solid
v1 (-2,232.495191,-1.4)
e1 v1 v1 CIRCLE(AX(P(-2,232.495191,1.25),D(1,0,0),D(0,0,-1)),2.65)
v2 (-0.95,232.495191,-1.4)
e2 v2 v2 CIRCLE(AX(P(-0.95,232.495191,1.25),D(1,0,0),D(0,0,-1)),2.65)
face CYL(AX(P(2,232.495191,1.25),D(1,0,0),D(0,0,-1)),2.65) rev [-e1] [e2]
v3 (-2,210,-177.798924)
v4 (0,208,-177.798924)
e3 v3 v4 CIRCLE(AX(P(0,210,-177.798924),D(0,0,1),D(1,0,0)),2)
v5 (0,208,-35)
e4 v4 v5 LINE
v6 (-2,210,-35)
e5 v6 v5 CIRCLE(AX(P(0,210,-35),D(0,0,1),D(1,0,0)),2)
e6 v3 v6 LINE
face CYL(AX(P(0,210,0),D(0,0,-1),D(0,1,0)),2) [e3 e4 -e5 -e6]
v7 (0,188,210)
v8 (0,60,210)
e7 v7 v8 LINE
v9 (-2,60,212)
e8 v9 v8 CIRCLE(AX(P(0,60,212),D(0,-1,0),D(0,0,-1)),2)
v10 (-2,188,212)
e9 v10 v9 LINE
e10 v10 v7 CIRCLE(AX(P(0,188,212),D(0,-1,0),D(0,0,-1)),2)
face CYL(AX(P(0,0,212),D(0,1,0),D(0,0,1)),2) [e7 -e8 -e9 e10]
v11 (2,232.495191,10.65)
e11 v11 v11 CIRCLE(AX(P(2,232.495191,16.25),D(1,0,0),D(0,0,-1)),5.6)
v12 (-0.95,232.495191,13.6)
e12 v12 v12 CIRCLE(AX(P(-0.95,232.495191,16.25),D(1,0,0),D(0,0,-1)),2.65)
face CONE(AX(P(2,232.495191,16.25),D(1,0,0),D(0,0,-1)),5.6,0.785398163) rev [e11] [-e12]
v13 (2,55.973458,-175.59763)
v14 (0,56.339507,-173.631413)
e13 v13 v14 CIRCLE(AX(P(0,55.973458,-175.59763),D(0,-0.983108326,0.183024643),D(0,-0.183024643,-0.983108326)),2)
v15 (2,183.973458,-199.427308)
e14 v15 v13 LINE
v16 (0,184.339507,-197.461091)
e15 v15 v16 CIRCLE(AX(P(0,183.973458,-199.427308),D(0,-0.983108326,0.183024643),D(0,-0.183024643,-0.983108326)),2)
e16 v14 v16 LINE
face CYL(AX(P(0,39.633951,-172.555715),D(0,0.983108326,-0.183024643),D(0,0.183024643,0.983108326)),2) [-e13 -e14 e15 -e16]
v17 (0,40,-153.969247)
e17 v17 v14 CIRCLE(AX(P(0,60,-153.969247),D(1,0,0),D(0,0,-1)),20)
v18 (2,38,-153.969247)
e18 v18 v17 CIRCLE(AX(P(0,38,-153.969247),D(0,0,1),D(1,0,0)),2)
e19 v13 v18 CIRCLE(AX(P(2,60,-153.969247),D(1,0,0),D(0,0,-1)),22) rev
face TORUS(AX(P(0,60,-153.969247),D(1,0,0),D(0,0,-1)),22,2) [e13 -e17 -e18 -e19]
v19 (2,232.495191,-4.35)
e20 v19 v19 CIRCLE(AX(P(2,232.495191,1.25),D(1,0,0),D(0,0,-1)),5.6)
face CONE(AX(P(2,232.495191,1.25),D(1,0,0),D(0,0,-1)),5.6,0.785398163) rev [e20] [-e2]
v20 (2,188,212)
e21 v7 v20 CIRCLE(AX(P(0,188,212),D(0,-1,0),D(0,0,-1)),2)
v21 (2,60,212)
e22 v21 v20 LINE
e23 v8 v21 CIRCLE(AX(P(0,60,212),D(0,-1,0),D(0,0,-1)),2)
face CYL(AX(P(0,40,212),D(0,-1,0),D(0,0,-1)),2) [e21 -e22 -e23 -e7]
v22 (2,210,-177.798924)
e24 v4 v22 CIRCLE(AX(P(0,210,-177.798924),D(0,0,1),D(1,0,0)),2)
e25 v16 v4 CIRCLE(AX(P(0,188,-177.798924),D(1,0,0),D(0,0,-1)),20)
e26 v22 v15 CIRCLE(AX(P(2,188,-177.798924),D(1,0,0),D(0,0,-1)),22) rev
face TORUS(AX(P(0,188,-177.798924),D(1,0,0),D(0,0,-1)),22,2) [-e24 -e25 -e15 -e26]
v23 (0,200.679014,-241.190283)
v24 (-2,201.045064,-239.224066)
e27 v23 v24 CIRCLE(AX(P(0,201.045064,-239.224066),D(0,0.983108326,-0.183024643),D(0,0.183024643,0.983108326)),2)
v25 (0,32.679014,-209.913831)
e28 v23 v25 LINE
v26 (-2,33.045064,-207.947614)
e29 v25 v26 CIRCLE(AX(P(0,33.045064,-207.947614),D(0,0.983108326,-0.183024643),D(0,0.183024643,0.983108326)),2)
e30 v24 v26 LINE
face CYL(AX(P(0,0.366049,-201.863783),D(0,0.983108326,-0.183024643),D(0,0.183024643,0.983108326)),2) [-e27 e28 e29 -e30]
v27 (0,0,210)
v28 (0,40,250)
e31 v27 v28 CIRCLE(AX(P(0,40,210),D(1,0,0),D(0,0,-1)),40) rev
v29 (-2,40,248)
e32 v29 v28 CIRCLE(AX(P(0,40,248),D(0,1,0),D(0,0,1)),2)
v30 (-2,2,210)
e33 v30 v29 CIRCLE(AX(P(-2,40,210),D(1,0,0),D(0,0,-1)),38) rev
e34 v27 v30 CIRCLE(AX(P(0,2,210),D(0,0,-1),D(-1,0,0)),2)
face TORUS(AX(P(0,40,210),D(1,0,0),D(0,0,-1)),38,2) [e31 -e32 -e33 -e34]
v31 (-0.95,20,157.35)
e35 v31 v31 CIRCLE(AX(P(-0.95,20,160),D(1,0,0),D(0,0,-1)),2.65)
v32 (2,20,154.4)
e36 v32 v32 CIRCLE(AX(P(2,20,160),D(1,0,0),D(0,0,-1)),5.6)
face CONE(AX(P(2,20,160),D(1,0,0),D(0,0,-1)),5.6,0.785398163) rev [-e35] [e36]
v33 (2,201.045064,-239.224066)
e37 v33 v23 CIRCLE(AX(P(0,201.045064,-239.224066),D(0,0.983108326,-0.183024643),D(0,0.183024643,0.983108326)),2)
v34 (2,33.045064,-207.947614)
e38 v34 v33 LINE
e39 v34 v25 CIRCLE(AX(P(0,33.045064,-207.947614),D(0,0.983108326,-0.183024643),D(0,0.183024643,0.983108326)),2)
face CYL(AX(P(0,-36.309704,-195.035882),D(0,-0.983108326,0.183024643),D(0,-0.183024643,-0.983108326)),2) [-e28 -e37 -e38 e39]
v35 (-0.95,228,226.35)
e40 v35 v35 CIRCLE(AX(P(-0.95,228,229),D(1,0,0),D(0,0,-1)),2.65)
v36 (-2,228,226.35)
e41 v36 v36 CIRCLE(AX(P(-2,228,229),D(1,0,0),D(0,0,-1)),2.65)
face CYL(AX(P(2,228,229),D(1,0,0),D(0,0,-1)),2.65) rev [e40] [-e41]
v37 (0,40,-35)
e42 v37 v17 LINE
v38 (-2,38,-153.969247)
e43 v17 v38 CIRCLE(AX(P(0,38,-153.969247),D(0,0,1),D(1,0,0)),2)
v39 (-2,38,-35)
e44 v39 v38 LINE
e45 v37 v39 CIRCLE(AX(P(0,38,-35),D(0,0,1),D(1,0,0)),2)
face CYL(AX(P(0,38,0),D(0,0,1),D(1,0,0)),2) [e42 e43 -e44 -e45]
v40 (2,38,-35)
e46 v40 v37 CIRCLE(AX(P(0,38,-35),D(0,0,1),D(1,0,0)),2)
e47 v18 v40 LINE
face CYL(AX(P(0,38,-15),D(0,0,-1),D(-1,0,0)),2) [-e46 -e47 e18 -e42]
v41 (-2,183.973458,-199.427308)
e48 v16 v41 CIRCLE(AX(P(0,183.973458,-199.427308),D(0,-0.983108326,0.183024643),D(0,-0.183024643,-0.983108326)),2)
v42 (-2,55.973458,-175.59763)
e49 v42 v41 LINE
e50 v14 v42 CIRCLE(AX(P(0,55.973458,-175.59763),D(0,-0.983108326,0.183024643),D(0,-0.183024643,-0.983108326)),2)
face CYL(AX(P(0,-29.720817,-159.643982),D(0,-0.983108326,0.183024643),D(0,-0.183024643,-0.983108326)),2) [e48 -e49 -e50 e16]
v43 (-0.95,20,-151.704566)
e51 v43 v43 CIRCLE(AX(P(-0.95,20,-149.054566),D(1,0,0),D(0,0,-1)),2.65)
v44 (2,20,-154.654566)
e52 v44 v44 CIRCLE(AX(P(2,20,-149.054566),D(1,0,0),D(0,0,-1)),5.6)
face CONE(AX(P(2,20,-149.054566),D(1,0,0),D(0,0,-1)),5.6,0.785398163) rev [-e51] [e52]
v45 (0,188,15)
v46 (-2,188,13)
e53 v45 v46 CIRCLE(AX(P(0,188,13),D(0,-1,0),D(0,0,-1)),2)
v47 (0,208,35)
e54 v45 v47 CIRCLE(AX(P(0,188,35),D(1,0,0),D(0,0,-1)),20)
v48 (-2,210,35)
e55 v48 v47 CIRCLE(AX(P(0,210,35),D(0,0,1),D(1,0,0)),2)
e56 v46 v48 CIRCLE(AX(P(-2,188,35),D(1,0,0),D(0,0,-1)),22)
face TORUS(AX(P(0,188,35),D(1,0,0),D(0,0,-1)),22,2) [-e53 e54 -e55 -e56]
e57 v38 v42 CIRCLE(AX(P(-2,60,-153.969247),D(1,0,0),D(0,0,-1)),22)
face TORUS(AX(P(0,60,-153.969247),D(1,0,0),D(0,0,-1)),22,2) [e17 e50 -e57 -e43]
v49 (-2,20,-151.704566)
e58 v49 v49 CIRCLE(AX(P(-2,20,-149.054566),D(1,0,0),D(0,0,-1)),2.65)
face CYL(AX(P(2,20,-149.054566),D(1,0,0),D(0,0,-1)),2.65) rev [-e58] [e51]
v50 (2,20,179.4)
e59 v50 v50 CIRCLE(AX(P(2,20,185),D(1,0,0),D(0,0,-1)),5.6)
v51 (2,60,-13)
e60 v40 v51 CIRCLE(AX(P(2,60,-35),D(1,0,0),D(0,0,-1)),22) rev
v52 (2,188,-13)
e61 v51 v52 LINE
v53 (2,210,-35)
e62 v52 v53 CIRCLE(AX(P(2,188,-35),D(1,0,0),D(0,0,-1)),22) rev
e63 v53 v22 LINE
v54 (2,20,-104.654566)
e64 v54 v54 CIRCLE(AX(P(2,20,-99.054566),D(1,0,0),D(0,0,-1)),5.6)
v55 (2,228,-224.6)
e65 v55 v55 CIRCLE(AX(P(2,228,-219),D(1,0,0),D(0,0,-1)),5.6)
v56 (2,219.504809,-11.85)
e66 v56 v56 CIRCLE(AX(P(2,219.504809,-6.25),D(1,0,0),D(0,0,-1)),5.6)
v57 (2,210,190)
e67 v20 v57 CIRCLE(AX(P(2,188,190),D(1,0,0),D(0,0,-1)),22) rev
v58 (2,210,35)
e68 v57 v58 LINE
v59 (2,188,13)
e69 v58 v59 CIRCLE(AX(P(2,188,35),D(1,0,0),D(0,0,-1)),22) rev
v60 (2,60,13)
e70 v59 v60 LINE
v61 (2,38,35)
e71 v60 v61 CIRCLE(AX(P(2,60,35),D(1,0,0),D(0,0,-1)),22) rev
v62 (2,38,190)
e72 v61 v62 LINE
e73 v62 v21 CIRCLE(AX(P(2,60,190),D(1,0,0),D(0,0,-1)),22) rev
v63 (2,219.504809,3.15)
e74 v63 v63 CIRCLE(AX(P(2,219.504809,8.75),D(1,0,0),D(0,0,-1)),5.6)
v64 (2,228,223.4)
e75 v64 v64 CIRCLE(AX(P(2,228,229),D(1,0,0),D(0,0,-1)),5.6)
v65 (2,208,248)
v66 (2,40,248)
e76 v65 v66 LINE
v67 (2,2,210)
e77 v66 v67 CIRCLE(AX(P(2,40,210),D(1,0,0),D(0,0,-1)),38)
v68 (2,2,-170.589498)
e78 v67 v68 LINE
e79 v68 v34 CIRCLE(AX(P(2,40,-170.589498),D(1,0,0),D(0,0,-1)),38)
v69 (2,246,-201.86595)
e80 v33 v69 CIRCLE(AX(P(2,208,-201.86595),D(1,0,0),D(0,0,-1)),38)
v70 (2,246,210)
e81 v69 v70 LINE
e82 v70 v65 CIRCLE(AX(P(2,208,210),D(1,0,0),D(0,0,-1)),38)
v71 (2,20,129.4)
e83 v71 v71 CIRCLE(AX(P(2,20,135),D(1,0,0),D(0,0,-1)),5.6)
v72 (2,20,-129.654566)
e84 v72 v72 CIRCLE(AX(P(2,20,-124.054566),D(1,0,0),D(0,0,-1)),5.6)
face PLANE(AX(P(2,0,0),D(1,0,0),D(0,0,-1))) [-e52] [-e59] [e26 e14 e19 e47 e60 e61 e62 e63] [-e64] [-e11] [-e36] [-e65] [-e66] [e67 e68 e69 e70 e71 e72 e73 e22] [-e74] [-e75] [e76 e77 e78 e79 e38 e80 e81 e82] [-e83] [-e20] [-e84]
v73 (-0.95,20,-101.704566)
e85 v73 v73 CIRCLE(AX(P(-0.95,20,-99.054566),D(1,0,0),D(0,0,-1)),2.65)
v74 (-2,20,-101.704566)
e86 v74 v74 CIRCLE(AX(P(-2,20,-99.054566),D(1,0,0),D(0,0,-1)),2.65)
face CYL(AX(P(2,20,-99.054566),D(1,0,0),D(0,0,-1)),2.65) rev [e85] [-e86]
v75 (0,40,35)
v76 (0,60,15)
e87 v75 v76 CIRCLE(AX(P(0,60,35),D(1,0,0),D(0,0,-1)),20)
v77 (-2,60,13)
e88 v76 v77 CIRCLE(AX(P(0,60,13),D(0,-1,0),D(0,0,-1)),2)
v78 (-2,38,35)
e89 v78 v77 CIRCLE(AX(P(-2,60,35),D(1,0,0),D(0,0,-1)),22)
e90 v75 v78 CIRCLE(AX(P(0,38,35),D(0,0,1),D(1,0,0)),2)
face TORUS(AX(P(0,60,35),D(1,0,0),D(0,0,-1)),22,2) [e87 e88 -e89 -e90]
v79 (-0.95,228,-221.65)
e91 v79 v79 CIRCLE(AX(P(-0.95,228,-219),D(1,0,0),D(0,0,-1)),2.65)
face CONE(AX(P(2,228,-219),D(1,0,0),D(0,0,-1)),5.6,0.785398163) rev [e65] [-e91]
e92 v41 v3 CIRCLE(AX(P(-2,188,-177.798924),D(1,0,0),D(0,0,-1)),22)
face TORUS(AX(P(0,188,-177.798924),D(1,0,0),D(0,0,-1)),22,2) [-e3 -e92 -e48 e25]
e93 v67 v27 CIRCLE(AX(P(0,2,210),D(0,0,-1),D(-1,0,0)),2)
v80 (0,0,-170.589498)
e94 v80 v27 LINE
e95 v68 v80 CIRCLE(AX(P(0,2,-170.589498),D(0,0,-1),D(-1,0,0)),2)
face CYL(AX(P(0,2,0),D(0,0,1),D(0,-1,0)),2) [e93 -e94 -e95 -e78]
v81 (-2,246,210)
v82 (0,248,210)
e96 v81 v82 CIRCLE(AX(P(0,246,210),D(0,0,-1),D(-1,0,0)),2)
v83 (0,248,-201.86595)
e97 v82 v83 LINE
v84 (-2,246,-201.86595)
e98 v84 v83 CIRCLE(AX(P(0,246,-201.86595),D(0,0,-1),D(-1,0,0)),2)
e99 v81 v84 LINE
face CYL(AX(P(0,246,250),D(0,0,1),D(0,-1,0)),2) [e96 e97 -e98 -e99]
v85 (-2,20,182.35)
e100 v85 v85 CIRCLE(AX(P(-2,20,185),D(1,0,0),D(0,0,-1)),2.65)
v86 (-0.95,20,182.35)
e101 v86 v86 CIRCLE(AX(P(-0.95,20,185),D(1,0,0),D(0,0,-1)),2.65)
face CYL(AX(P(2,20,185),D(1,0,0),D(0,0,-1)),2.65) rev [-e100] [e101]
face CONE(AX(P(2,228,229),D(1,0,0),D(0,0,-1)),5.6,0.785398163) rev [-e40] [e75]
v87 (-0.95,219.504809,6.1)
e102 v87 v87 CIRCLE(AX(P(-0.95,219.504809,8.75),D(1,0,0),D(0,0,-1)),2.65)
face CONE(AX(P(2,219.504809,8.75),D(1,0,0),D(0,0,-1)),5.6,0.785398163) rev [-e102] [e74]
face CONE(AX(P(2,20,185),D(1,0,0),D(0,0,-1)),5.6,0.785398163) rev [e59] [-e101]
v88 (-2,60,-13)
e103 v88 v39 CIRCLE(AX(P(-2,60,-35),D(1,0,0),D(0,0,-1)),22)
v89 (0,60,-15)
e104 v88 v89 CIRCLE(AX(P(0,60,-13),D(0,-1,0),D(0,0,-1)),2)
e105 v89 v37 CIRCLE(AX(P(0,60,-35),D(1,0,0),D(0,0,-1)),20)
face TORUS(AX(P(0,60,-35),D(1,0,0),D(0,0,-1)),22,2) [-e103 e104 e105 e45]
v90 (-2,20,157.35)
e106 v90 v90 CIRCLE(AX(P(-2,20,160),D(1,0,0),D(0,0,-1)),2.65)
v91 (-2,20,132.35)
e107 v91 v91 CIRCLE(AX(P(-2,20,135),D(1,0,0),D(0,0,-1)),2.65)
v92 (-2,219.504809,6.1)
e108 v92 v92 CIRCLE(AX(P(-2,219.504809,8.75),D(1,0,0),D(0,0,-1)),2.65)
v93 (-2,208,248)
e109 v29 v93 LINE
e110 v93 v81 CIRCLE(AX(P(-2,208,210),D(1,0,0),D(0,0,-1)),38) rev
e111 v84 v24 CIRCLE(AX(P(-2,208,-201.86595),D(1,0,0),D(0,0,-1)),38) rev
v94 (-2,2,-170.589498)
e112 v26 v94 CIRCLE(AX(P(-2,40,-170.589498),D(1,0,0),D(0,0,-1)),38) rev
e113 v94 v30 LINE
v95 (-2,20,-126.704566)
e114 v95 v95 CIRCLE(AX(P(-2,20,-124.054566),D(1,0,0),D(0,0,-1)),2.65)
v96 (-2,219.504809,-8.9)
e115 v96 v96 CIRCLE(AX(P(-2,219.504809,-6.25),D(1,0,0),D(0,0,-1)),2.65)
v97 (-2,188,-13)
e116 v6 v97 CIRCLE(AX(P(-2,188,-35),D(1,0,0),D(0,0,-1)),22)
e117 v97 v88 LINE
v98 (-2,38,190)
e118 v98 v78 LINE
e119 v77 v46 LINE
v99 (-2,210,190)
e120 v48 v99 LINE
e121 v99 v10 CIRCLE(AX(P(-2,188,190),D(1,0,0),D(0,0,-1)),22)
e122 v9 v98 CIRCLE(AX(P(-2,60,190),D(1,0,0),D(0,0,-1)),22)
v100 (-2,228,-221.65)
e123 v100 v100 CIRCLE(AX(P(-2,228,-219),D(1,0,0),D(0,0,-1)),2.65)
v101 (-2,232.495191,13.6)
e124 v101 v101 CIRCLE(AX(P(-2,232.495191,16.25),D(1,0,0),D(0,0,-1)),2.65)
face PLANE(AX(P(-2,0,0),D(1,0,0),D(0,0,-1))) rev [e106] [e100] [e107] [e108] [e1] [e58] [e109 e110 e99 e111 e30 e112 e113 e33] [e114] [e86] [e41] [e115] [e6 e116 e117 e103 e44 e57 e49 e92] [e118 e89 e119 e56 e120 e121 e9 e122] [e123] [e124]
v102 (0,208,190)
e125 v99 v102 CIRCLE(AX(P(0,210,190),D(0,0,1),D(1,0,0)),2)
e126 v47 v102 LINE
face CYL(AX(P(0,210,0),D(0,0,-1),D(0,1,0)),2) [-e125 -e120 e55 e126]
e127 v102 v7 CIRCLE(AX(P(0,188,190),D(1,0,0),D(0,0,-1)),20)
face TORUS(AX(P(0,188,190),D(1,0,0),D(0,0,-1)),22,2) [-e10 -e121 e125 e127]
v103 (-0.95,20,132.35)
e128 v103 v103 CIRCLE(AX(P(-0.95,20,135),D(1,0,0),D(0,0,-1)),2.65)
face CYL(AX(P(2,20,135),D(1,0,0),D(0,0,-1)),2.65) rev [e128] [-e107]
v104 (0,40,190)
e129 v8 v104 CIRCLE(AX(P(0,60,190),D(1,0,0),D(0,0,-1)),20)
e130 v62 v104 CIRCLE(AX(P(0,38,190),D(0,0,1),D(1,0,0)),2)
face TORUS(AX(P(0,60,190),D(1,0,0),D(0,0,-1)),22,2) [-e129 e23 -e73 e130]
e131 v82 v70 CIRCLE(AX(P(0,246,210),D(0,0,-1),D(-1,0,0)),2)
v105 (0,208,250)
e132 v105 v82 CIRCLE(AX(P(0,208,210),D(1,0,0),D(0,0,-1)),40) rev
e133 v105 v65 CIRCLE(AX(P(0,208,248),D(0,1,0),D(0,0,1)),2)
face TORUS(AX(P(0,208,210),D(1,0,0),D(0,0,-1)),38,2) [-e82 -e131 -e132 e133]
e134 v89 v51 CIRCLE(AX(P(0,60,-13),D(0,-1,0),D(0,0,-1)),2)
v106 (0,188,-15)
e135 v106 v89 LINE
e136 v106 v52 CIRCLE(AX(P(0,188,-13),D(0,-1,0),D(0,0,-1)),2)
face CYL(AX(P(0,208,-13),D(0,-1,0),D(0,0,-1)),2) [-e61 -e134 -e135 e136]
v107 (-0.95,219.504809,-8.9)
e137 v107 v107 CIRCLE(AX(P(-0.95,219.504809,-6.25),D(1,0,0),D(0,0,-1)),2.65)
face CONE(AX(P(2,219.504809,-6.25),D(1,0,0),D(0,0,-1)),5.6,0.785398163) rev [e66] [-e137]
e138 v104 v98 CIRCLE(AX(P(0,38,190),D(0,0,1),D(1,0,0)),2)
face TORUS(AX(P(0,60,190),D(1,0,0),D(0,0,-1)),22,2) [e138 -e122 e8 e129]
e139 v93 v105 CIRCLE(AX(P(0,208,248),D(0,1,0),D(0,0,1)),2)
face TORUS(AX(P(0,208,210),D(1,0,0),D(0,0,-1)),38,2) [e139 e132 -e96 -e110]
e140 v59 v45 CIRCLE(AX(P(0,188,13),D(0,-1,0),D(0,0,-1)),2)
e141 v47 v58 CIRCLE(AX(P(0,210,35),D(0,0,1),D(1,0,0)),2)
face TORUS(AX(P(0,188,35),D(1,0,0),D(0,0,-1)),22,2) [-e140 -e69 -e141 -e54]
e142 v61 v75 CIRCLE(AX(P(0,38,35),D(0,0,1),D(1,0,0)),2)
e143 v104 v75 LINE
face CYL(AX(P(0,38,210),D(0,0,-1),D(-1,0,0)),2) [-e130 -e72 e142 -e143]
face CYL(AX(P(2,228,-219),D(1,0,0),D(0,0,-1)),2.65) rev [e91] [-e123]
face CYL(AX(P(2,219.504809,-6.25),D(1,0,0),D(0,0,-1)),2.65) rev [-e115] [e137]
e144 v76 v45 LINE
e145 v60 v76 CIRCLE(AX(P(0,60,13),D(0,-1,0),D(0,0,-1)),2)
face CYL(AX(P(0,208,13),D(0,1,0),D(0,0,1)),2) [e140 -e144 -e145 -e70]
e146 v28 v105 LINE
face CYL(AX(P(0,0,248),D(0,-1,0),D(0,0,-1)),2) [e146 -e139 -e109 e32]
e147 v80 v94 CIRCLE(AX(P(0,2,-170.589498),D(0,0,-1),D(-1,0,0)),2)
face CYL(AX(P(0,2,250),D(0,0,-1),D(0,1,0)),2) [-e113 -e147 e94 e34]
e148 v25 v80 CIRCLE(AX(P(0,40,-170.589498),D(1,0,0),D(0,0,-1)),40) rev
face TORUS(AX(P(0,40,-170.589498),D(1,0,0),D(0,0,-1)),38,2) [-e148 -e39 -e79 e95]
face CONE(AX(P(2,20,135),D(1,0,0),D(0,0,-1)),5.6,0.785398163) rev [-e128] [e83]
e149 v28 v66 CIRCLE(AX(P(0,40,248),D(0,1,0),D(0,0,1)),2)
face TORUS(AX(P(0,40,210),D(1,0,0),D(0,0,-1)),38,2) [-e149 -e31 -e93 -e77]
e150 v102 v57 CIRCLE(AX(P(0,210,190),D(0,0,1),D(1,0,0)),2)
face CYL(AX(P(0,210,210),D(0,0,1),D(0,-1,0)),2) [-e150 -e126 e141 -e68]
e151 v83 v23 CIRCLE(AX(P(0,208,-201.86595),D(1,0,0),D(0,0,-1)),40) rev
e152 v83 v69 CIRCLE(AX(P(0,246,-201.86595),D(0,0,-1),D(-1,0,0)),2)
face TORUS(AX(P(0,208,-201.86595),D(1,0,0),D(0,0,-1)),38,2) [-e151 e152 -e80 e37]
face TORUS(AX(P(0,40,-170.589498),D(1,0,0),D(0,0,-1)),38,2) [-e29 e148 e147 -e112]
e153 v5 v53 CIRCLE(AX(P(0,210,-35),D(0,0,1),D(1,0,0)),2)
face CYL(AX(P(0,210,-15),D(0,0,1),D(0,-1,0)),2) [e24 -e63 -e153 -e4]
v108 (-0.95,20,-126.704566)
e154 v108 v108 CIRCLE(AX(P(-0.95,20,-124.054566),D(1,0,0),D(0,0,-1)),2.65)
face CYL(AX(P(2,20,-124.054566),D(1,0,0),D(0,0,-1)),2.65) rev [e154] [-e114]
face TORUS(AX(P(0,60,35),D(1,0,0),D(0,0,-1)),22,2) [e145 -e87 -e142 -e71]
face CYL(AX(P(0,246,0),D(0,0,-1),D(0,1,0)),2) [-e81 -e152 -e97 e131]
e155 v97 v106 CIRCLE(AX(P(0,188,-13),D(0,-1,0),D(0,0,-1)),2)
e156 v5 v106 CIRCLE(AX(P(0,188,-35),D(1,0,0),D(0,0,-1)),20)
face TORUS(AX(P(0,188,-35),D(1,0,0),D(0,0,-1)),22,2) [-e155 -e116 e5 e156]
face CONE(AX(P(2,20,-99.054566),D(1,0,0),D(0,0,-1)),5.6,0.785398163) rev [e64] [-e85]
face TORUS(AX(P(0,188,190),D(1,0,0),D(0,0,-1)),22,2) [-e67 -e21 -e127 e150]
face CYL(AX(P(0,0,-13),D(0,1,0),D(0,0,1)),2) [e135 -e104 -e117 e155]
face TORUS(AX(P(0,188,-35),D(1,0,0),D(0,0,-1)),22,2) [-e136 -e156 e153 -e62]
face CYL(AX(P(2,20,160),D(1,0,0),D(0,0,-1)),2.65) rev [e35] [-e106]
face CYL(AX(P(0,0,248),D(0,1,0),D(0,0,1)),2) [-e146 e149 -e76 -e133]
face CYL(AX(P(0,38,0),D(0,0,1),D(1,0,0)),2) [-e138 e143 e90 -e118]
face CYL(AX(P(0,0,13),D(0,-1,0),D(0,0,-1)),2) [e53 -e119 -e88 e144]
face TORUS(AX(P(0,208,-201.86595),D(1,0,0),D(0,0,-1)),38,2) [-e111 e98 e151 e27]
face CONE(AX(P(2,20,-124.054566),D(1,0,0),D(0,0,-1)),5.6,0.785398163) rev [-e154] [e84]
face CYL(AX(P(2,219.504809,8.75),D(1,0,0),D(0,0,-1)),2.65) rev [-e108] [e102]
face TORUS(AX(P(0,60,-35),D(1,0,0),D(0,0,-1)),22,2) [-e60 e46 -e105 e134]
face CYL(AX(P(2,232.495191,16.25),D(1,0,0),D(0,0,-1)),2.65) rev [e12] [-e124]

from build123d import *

# Parameters (mm, degrees)
CROQUIS1_W                                    = 195
CROQUIS1_H                                    = 168
SALIENTE_EXTRUIR1_DEPTH                       = 2
REDONDEO1_R                                   = 40
REDONDEO2_R                                   = 20
REFRENTADO_PARA_TORNILLO_TAP_N_CON_C_2_COUNT  = 2
REFRENTADO_PARA_TORNILLO_TAP_N_CON_C_2_PITCH  = 448
REFRENTADO_PARA_TORNILLO_TAP_N_CON_C_3_COUNT  = 2
REFRENTADO_PARA_TORNILLO_TAP_N_CON_C_3_PITCH  = 431.496529335
REFRENTADO_PARA_TORNILLO_TAP_N_CON_C_4_COUNT  = 2
REFRENTADO_PARA_TORNILLO_TAP_N_CON_C_4_PITCH  = 409.770089844
REFRENTADO_PARA_TORNILLO_TAP_N_CON_C_5_COUNT  = 2
REFRENTADO_PARA_TORNILLO_TAP_N_CON_C_5_PITCH  = 388.43763751
REFRENTADO_PARA_TORNILLO_TAP_N_CON_C_6_COUNT  = 2
REFRENTADO_PARA_TORNILLO_TAP_N_CON_C_6_PITCH  = 212.602916255
REFRENTADO_PARA_TORNILLO_TAP_N_CON_C_7_COUNT  = 2
REFRENTADO_PARA_TORNILLO_TAP_N_CON_C_7_PITCH  = 219.146070008
REFRENTADO_PARA_TORNILLO_TAP_N_CON_C_8_COUNT  = 2
REFRENTADO_PARA_TORNILLO_TAP_N_CON_C_8_PITCH  = 228.25424421
REFRENTADO_PARA_TORNILLO_TAP_N_CON_C_9_COUNT  = 2
REFRENTADO_PARA_TORNILLO_TAP_N_CON_C_9_PITCH  = 227.794357344
REFRENTADO_PARA_TORNILLO_TAP_N_CON_C_10_COUNT = 2
REFRENTADO_PARA_TORNILLO_TAP_N_CON_C_10_PITCH = 212.797484097
REFRENTADO_PARA_TORNILLO_TAP_N_CON_C_11_COUNT = 2
REFRENTADO_PARA_TORNILLO_TAP_N_CON_C_11_PITCH = 220.413771716
REFRENTADO_PARA_TORNILLO_TAP_N_CON_C_12_COUNT = 2
REFRENTADO_PARA_TORNILLO_TAP_N_CON_C_12_PITCH = 235.403336344
REDONDEO3_R                                   = 2


with BuildPart() as part:
    # Croquis1 → Saliente-Extruir1 (new, symmetric)
    with BuildSketch(Plane(origin=(0, 0, 0), x_dir=(0, 0, -1), z_dir=(1, 0, 0))):
        Polygon((-250, 0), (-250, 248), (250, 248), (203.83, 0), align=None)
        Polygon((170.589497977, 40), (201.86594959, 208), (15, 208), (15, 40), align=None, mode=Mode.SUBTRACT)
        with Locations((-112.5, 124)):
            Rectangle(CROQUIS1_W, CROQUIS1_H, mode=Mode.SUBTRACT)
    extrude(amount=SALIENTE_EXTRUIR1_DEPTH, both=True)

    # Redondeo1
    redondeo1_edges = [part.edges().sort_by_distance(p)[0] for p in [
        (0, 248, -250),
        (0, 0, -203.83),
        (0, 0, 250),
        (0, 248, 250),
    ]]
    fillet(redondeo1_edges, radius=REDONDEO1_R)

    # Redondeo2
    redondeo2_edges = [part.edges().sort_by_distance(p)[0] for p in [
        (0, 208, 15),
        (0, 208, 210),
        (0, 40, 210),
        (0, 40, 15),
        (0, 208, -201.86594959),
        (0, 208, -15),
        (0, 40, -15),
        (0, 40, -170.589497977),
    ]]
    fillet(redondeo2_edges, radius=REDONDEO2_R)

    # Croquis14 → Refrentado para tornillo tapón con cabeza plana de clavija de M51 (revolve, cut)
    with BuildSketch(Plane(origin=(2, 228, 229), x_dir=(0, 0, -1), z_dir=(0, 1, 0))):
        Polygon((0, 0), (0, 4), (2.65, 4), (2.65, 2.95), (5.6, 0), align=None)
    refrentado_para_tornillo_tap_n_con_cabez = revolve(axis=Axis((8.35, 228, 229), (-1, 0, 0)), mode=Mode.SUBTRACT)

    # Refrentado para tornillo tap_n con c 2: Refrentado para tornillo tapón con cabeza plana de clavija de M51 ×2
    with Locations(*[(0, 0, -i * REFRENTADO_PARA_TORNILLO_TAP_N_CON_C_2_PITCH) for i in range(1, REFRENTADO_PARA_TORNILLO_TAP_N_CON_C_2_COUNT)]):
        add(refrentado_para_tornillo_tap_n_con_cabez, mode=Mode.SUBTRACT)

    # Refrentado para tornillo tap_n con c 3: Refrentado para tornillo tapón con cabeza plana de clavija de M51 ×2
    with Locations(*[Vector(0, -0.4820432746483433, -0.8761474084686333) * (i * REFRENTADO_PARA_TORNILLO_TAP_N_CON_C_3_PITCH) for i in range(1, REFRENTADO_PARA_TORNILLO_TAP_N_CON_C_3_COUNT)]):
        add(refrentado_para_tornillo_tap_n_con_cabez, mode=Mode.SUBTRACT)

    # Refrentado para tornillo tap_n con c 4: Refrentado para tornillo tapón con cabeza plana de clavija de M51 ×2
    with Locations(*[Vector(0, -0.5076017141197064, -0.8615918406198702) * (i * REFRENTADO_PARA_TORNILLO_TAP_N_CON_C_4_PITCH) for i in range(1, REFRENTADO_PARA_TORNILLO_TAP_N_CON_C_4_COUNT)]):
        add(refrentado_para_tornillo_tap_n_con_cabez, mode=Mode.SUBTRACT)

    # Refrentado para tornillo tap_n con c 5: Refrentado para tornillo tapón con cabeza plana de clavija de M51 ×2
    with Locations(*[Vector(0, -0.5354784910482062, -0.8445488651491613) * (i * REFRENTADO_PARA_TORNILLO_TAP_N_CON_C_5_PITCH) for i in range(1, REFRENTADO_PARA_TORNILLO_TAP_N_CON_C_5_COUNT)]):
        add(refrentado_para_tornillo_tap_n_con_cabez, mode=Mode.SUBTRACT)

    # Refrentado para tornillo tap_n con c 6: Refrentado para tornillo tapón con cabeza plana de clavija de M51 ×2
    with Locations(*[Vector(0, -0.9783497031189412, -0.20695859104439157) * (i * REFRENTADO_PARA_TORNILLO_TAP_N_CON_C_6_PITCH) for i in range(1, REFRENTADO_PARA_TORNILLO_TAP_N_CON_C_6_COUNT)]):
        add(refrentado_para_tornillo_tap_n_con_cabez, mode=Mode.SUBTRACT)

    # Refrentado para tornillo tap_n con c 7: Refrentado para tornillo tapón con cabeza plana de clavija de M51 ×2
    with Locations(*[Vector(0, -0.9491386270002529, -0.3148584868414302) * (i * REFRENTADO_PARA_TORNILLO_TAP_N_CON_C_7_PITCH) for i in range(1, REFRENTADO_PARA_TORNILLO_TAP_N_CON_C_7_COUNT)]):
        add(refrentado_para_tornillo_tap_n_con_cabez, mode=Mode.SUBTRACT)

    # Refrentado para tornillo tap_n con c 8: Refrentado para tornillo tapón con cabeza plana de clavija de M51 ×2
    with Locations(*[Vector(0, -0.9112645450237129, -0.4118214770780242) * (i * REFRENTADO_PARA_TORNILLO_TAP_N_CON_C_8_PITCH) for i in range(1, REFRENTADO_PARA_TORNILLO_TAP_N_CON_C_8_COUNT)]):
        add(refrentado_para_tornillo_tap_n_con_cabez, mode=Mode.SUBTRACT)

    # Refrentado para tornillo tap_n con c 9: Refrentado para tornillo tapón con cabeza plana de clavija de M51 ×2
    with Locations(*[Vector(0, 0.019733546435435883, -0.9998052746135522) * (i * REFRENTADO_PARA_TORNILLO_TAP_N_CON_C_9_PITCH) for i in range(1, REFRENTADO_PARA_TORNILLO_TAP_N_CON_C_9_COUNT)]):
        add(refrentado_para_tornillo_tap_n_con_cabez, mode=Mode.SUBTRACT)

    # Refrentado para tornillo tap_n con c 10: Refrentado para tornillo tapón con cabeza plana de clavija de M51 ×2
    with Locations(*[Vector(0, 0.021124265390001246, -0.9997768578096479) * (i * REFRENTADO_PARA_TORNILLO_TAP_N_CON_C_10_PITCH) for i in range(1, REFRENTADO_PARA_TORNILLO_TAP_N_CON_C_10_COUNT)]):
        add(refrentado_para_tornillo_tap_n_con_cabez, mode=Mode.SUBTRACT)

    # Refrentado para tornillo tap_n con c 11: Refrentado para tornillo tapón con cabeza plana de clavija de M51 ×2
    with Locations(*[Vector(0, -0.03854201333356631, -0.9992569805651573) * (i * REFRENTADO_PARA_TORNILLO_TAP_N_CON_C_11_PITCH) for i in range(1, REFRENTADO_PARA_TORNILLO_TAP_N_CON_C_11_COUNT)]):
        add(refrentado_para_tornillo_tap_n_con_cabez, mode=Mode.SUBTRACT)

    # Refrentado para tornillo tap_n con c 12: Refrentado para tornillo tapón con cabeza plana de clavija de M51 ×2
    with Locations(*[Vector(0, -0.03608780852600862, -0.9993486228918266) * (i * REFRENTADO_PARA_TORNILLO_TAP_N_CON_C_12_PITCH) for i in range(1, REFRENTADO_PARA_TORNILLO_TAP_N_CON_C_12_COUNT)]):
        add(refrentado_para_tornillo_tap_n_con_cabez, mode=Mode.SUBTRACT)

    # Redondeo3
    redondeo3_edges = [part.edges().sort_by_distance(p)[0] for p in [
        (-2, 45.857864376, -20.857864376),
        (-2, 124, -15),
        (-2, 202.142135624, -20.857864376),
        (-2, 208, -106.399462193),
        (-2, 200.782608163, -193.180892028),
        (-2, 120.339507145, -185.546252191),
        (-2, 44.618032358, -166.751855129),
        (-2, 45.857864376, 204.142135624),
        (-2, 124, 210),
        (-2, 202.142135624, 204.142135624),
        (-2, 208, 112.5),
        (-2, 202.142135624, 20.857864376),
        (-2, 124, 15),
        (-2, 45.857864376, 20.857864376),
        (2, 45.857864376, -20.857864376),
        (2, 124, -15),
        (2, 202.142135624, -20.857864376),
        (2, 208, -106.399462193),
        (2, 200.782608163, -193.180892028),
        (2, 120.339507145, -185.546252191),
        (2, 44.618032358, -166.751855129),
        (2, 202.142135624, 20.857864376),
        (2, 124, 15),
        (2, 45.857864376, 20.857864376),
        (2, 40, 112.5),
        (2, 45.857864376, 204.142135624),
        (2, 124, 210),
        (2, 202.142135624, 204.142135624),
        (-2, 40, -94.484623483),
        (-2, 40, 112.5),
        (2, 40, -94.484623483),
        (2, 208, 112.5),
        (-2, 233.565216326, -232.629884875),
        (-2, 116.67901429, -225.552056814),
        (-2, 9.236064715, -196.154714304),
        (-2, 0, 19.705251011),
        (-2, 11.715728753, 238.284271247),
        (-2, 124, 250),
        (-2, 236.284271247, 238.284271247),
        (2, 233.565216326, -232.629884875),
        (2, 116.67901429, -225.552056814),
        (2, 9.236064715, -196.154714304),
        (2, 0, 19.705251011),
        (2, 11.715728753, 238.284271247),
        (2, 124, 250),
        (2, 236.284271247, 238.284271247),
        (-2, 248, 4.067025205),
        (2, 248, 4.067025205),
    ]]
    fillet(redondeo3_edges, radius=REDONDEO3_R - 0.0001)  # a hair under: the kernel refuses the full size


solid = part.part
